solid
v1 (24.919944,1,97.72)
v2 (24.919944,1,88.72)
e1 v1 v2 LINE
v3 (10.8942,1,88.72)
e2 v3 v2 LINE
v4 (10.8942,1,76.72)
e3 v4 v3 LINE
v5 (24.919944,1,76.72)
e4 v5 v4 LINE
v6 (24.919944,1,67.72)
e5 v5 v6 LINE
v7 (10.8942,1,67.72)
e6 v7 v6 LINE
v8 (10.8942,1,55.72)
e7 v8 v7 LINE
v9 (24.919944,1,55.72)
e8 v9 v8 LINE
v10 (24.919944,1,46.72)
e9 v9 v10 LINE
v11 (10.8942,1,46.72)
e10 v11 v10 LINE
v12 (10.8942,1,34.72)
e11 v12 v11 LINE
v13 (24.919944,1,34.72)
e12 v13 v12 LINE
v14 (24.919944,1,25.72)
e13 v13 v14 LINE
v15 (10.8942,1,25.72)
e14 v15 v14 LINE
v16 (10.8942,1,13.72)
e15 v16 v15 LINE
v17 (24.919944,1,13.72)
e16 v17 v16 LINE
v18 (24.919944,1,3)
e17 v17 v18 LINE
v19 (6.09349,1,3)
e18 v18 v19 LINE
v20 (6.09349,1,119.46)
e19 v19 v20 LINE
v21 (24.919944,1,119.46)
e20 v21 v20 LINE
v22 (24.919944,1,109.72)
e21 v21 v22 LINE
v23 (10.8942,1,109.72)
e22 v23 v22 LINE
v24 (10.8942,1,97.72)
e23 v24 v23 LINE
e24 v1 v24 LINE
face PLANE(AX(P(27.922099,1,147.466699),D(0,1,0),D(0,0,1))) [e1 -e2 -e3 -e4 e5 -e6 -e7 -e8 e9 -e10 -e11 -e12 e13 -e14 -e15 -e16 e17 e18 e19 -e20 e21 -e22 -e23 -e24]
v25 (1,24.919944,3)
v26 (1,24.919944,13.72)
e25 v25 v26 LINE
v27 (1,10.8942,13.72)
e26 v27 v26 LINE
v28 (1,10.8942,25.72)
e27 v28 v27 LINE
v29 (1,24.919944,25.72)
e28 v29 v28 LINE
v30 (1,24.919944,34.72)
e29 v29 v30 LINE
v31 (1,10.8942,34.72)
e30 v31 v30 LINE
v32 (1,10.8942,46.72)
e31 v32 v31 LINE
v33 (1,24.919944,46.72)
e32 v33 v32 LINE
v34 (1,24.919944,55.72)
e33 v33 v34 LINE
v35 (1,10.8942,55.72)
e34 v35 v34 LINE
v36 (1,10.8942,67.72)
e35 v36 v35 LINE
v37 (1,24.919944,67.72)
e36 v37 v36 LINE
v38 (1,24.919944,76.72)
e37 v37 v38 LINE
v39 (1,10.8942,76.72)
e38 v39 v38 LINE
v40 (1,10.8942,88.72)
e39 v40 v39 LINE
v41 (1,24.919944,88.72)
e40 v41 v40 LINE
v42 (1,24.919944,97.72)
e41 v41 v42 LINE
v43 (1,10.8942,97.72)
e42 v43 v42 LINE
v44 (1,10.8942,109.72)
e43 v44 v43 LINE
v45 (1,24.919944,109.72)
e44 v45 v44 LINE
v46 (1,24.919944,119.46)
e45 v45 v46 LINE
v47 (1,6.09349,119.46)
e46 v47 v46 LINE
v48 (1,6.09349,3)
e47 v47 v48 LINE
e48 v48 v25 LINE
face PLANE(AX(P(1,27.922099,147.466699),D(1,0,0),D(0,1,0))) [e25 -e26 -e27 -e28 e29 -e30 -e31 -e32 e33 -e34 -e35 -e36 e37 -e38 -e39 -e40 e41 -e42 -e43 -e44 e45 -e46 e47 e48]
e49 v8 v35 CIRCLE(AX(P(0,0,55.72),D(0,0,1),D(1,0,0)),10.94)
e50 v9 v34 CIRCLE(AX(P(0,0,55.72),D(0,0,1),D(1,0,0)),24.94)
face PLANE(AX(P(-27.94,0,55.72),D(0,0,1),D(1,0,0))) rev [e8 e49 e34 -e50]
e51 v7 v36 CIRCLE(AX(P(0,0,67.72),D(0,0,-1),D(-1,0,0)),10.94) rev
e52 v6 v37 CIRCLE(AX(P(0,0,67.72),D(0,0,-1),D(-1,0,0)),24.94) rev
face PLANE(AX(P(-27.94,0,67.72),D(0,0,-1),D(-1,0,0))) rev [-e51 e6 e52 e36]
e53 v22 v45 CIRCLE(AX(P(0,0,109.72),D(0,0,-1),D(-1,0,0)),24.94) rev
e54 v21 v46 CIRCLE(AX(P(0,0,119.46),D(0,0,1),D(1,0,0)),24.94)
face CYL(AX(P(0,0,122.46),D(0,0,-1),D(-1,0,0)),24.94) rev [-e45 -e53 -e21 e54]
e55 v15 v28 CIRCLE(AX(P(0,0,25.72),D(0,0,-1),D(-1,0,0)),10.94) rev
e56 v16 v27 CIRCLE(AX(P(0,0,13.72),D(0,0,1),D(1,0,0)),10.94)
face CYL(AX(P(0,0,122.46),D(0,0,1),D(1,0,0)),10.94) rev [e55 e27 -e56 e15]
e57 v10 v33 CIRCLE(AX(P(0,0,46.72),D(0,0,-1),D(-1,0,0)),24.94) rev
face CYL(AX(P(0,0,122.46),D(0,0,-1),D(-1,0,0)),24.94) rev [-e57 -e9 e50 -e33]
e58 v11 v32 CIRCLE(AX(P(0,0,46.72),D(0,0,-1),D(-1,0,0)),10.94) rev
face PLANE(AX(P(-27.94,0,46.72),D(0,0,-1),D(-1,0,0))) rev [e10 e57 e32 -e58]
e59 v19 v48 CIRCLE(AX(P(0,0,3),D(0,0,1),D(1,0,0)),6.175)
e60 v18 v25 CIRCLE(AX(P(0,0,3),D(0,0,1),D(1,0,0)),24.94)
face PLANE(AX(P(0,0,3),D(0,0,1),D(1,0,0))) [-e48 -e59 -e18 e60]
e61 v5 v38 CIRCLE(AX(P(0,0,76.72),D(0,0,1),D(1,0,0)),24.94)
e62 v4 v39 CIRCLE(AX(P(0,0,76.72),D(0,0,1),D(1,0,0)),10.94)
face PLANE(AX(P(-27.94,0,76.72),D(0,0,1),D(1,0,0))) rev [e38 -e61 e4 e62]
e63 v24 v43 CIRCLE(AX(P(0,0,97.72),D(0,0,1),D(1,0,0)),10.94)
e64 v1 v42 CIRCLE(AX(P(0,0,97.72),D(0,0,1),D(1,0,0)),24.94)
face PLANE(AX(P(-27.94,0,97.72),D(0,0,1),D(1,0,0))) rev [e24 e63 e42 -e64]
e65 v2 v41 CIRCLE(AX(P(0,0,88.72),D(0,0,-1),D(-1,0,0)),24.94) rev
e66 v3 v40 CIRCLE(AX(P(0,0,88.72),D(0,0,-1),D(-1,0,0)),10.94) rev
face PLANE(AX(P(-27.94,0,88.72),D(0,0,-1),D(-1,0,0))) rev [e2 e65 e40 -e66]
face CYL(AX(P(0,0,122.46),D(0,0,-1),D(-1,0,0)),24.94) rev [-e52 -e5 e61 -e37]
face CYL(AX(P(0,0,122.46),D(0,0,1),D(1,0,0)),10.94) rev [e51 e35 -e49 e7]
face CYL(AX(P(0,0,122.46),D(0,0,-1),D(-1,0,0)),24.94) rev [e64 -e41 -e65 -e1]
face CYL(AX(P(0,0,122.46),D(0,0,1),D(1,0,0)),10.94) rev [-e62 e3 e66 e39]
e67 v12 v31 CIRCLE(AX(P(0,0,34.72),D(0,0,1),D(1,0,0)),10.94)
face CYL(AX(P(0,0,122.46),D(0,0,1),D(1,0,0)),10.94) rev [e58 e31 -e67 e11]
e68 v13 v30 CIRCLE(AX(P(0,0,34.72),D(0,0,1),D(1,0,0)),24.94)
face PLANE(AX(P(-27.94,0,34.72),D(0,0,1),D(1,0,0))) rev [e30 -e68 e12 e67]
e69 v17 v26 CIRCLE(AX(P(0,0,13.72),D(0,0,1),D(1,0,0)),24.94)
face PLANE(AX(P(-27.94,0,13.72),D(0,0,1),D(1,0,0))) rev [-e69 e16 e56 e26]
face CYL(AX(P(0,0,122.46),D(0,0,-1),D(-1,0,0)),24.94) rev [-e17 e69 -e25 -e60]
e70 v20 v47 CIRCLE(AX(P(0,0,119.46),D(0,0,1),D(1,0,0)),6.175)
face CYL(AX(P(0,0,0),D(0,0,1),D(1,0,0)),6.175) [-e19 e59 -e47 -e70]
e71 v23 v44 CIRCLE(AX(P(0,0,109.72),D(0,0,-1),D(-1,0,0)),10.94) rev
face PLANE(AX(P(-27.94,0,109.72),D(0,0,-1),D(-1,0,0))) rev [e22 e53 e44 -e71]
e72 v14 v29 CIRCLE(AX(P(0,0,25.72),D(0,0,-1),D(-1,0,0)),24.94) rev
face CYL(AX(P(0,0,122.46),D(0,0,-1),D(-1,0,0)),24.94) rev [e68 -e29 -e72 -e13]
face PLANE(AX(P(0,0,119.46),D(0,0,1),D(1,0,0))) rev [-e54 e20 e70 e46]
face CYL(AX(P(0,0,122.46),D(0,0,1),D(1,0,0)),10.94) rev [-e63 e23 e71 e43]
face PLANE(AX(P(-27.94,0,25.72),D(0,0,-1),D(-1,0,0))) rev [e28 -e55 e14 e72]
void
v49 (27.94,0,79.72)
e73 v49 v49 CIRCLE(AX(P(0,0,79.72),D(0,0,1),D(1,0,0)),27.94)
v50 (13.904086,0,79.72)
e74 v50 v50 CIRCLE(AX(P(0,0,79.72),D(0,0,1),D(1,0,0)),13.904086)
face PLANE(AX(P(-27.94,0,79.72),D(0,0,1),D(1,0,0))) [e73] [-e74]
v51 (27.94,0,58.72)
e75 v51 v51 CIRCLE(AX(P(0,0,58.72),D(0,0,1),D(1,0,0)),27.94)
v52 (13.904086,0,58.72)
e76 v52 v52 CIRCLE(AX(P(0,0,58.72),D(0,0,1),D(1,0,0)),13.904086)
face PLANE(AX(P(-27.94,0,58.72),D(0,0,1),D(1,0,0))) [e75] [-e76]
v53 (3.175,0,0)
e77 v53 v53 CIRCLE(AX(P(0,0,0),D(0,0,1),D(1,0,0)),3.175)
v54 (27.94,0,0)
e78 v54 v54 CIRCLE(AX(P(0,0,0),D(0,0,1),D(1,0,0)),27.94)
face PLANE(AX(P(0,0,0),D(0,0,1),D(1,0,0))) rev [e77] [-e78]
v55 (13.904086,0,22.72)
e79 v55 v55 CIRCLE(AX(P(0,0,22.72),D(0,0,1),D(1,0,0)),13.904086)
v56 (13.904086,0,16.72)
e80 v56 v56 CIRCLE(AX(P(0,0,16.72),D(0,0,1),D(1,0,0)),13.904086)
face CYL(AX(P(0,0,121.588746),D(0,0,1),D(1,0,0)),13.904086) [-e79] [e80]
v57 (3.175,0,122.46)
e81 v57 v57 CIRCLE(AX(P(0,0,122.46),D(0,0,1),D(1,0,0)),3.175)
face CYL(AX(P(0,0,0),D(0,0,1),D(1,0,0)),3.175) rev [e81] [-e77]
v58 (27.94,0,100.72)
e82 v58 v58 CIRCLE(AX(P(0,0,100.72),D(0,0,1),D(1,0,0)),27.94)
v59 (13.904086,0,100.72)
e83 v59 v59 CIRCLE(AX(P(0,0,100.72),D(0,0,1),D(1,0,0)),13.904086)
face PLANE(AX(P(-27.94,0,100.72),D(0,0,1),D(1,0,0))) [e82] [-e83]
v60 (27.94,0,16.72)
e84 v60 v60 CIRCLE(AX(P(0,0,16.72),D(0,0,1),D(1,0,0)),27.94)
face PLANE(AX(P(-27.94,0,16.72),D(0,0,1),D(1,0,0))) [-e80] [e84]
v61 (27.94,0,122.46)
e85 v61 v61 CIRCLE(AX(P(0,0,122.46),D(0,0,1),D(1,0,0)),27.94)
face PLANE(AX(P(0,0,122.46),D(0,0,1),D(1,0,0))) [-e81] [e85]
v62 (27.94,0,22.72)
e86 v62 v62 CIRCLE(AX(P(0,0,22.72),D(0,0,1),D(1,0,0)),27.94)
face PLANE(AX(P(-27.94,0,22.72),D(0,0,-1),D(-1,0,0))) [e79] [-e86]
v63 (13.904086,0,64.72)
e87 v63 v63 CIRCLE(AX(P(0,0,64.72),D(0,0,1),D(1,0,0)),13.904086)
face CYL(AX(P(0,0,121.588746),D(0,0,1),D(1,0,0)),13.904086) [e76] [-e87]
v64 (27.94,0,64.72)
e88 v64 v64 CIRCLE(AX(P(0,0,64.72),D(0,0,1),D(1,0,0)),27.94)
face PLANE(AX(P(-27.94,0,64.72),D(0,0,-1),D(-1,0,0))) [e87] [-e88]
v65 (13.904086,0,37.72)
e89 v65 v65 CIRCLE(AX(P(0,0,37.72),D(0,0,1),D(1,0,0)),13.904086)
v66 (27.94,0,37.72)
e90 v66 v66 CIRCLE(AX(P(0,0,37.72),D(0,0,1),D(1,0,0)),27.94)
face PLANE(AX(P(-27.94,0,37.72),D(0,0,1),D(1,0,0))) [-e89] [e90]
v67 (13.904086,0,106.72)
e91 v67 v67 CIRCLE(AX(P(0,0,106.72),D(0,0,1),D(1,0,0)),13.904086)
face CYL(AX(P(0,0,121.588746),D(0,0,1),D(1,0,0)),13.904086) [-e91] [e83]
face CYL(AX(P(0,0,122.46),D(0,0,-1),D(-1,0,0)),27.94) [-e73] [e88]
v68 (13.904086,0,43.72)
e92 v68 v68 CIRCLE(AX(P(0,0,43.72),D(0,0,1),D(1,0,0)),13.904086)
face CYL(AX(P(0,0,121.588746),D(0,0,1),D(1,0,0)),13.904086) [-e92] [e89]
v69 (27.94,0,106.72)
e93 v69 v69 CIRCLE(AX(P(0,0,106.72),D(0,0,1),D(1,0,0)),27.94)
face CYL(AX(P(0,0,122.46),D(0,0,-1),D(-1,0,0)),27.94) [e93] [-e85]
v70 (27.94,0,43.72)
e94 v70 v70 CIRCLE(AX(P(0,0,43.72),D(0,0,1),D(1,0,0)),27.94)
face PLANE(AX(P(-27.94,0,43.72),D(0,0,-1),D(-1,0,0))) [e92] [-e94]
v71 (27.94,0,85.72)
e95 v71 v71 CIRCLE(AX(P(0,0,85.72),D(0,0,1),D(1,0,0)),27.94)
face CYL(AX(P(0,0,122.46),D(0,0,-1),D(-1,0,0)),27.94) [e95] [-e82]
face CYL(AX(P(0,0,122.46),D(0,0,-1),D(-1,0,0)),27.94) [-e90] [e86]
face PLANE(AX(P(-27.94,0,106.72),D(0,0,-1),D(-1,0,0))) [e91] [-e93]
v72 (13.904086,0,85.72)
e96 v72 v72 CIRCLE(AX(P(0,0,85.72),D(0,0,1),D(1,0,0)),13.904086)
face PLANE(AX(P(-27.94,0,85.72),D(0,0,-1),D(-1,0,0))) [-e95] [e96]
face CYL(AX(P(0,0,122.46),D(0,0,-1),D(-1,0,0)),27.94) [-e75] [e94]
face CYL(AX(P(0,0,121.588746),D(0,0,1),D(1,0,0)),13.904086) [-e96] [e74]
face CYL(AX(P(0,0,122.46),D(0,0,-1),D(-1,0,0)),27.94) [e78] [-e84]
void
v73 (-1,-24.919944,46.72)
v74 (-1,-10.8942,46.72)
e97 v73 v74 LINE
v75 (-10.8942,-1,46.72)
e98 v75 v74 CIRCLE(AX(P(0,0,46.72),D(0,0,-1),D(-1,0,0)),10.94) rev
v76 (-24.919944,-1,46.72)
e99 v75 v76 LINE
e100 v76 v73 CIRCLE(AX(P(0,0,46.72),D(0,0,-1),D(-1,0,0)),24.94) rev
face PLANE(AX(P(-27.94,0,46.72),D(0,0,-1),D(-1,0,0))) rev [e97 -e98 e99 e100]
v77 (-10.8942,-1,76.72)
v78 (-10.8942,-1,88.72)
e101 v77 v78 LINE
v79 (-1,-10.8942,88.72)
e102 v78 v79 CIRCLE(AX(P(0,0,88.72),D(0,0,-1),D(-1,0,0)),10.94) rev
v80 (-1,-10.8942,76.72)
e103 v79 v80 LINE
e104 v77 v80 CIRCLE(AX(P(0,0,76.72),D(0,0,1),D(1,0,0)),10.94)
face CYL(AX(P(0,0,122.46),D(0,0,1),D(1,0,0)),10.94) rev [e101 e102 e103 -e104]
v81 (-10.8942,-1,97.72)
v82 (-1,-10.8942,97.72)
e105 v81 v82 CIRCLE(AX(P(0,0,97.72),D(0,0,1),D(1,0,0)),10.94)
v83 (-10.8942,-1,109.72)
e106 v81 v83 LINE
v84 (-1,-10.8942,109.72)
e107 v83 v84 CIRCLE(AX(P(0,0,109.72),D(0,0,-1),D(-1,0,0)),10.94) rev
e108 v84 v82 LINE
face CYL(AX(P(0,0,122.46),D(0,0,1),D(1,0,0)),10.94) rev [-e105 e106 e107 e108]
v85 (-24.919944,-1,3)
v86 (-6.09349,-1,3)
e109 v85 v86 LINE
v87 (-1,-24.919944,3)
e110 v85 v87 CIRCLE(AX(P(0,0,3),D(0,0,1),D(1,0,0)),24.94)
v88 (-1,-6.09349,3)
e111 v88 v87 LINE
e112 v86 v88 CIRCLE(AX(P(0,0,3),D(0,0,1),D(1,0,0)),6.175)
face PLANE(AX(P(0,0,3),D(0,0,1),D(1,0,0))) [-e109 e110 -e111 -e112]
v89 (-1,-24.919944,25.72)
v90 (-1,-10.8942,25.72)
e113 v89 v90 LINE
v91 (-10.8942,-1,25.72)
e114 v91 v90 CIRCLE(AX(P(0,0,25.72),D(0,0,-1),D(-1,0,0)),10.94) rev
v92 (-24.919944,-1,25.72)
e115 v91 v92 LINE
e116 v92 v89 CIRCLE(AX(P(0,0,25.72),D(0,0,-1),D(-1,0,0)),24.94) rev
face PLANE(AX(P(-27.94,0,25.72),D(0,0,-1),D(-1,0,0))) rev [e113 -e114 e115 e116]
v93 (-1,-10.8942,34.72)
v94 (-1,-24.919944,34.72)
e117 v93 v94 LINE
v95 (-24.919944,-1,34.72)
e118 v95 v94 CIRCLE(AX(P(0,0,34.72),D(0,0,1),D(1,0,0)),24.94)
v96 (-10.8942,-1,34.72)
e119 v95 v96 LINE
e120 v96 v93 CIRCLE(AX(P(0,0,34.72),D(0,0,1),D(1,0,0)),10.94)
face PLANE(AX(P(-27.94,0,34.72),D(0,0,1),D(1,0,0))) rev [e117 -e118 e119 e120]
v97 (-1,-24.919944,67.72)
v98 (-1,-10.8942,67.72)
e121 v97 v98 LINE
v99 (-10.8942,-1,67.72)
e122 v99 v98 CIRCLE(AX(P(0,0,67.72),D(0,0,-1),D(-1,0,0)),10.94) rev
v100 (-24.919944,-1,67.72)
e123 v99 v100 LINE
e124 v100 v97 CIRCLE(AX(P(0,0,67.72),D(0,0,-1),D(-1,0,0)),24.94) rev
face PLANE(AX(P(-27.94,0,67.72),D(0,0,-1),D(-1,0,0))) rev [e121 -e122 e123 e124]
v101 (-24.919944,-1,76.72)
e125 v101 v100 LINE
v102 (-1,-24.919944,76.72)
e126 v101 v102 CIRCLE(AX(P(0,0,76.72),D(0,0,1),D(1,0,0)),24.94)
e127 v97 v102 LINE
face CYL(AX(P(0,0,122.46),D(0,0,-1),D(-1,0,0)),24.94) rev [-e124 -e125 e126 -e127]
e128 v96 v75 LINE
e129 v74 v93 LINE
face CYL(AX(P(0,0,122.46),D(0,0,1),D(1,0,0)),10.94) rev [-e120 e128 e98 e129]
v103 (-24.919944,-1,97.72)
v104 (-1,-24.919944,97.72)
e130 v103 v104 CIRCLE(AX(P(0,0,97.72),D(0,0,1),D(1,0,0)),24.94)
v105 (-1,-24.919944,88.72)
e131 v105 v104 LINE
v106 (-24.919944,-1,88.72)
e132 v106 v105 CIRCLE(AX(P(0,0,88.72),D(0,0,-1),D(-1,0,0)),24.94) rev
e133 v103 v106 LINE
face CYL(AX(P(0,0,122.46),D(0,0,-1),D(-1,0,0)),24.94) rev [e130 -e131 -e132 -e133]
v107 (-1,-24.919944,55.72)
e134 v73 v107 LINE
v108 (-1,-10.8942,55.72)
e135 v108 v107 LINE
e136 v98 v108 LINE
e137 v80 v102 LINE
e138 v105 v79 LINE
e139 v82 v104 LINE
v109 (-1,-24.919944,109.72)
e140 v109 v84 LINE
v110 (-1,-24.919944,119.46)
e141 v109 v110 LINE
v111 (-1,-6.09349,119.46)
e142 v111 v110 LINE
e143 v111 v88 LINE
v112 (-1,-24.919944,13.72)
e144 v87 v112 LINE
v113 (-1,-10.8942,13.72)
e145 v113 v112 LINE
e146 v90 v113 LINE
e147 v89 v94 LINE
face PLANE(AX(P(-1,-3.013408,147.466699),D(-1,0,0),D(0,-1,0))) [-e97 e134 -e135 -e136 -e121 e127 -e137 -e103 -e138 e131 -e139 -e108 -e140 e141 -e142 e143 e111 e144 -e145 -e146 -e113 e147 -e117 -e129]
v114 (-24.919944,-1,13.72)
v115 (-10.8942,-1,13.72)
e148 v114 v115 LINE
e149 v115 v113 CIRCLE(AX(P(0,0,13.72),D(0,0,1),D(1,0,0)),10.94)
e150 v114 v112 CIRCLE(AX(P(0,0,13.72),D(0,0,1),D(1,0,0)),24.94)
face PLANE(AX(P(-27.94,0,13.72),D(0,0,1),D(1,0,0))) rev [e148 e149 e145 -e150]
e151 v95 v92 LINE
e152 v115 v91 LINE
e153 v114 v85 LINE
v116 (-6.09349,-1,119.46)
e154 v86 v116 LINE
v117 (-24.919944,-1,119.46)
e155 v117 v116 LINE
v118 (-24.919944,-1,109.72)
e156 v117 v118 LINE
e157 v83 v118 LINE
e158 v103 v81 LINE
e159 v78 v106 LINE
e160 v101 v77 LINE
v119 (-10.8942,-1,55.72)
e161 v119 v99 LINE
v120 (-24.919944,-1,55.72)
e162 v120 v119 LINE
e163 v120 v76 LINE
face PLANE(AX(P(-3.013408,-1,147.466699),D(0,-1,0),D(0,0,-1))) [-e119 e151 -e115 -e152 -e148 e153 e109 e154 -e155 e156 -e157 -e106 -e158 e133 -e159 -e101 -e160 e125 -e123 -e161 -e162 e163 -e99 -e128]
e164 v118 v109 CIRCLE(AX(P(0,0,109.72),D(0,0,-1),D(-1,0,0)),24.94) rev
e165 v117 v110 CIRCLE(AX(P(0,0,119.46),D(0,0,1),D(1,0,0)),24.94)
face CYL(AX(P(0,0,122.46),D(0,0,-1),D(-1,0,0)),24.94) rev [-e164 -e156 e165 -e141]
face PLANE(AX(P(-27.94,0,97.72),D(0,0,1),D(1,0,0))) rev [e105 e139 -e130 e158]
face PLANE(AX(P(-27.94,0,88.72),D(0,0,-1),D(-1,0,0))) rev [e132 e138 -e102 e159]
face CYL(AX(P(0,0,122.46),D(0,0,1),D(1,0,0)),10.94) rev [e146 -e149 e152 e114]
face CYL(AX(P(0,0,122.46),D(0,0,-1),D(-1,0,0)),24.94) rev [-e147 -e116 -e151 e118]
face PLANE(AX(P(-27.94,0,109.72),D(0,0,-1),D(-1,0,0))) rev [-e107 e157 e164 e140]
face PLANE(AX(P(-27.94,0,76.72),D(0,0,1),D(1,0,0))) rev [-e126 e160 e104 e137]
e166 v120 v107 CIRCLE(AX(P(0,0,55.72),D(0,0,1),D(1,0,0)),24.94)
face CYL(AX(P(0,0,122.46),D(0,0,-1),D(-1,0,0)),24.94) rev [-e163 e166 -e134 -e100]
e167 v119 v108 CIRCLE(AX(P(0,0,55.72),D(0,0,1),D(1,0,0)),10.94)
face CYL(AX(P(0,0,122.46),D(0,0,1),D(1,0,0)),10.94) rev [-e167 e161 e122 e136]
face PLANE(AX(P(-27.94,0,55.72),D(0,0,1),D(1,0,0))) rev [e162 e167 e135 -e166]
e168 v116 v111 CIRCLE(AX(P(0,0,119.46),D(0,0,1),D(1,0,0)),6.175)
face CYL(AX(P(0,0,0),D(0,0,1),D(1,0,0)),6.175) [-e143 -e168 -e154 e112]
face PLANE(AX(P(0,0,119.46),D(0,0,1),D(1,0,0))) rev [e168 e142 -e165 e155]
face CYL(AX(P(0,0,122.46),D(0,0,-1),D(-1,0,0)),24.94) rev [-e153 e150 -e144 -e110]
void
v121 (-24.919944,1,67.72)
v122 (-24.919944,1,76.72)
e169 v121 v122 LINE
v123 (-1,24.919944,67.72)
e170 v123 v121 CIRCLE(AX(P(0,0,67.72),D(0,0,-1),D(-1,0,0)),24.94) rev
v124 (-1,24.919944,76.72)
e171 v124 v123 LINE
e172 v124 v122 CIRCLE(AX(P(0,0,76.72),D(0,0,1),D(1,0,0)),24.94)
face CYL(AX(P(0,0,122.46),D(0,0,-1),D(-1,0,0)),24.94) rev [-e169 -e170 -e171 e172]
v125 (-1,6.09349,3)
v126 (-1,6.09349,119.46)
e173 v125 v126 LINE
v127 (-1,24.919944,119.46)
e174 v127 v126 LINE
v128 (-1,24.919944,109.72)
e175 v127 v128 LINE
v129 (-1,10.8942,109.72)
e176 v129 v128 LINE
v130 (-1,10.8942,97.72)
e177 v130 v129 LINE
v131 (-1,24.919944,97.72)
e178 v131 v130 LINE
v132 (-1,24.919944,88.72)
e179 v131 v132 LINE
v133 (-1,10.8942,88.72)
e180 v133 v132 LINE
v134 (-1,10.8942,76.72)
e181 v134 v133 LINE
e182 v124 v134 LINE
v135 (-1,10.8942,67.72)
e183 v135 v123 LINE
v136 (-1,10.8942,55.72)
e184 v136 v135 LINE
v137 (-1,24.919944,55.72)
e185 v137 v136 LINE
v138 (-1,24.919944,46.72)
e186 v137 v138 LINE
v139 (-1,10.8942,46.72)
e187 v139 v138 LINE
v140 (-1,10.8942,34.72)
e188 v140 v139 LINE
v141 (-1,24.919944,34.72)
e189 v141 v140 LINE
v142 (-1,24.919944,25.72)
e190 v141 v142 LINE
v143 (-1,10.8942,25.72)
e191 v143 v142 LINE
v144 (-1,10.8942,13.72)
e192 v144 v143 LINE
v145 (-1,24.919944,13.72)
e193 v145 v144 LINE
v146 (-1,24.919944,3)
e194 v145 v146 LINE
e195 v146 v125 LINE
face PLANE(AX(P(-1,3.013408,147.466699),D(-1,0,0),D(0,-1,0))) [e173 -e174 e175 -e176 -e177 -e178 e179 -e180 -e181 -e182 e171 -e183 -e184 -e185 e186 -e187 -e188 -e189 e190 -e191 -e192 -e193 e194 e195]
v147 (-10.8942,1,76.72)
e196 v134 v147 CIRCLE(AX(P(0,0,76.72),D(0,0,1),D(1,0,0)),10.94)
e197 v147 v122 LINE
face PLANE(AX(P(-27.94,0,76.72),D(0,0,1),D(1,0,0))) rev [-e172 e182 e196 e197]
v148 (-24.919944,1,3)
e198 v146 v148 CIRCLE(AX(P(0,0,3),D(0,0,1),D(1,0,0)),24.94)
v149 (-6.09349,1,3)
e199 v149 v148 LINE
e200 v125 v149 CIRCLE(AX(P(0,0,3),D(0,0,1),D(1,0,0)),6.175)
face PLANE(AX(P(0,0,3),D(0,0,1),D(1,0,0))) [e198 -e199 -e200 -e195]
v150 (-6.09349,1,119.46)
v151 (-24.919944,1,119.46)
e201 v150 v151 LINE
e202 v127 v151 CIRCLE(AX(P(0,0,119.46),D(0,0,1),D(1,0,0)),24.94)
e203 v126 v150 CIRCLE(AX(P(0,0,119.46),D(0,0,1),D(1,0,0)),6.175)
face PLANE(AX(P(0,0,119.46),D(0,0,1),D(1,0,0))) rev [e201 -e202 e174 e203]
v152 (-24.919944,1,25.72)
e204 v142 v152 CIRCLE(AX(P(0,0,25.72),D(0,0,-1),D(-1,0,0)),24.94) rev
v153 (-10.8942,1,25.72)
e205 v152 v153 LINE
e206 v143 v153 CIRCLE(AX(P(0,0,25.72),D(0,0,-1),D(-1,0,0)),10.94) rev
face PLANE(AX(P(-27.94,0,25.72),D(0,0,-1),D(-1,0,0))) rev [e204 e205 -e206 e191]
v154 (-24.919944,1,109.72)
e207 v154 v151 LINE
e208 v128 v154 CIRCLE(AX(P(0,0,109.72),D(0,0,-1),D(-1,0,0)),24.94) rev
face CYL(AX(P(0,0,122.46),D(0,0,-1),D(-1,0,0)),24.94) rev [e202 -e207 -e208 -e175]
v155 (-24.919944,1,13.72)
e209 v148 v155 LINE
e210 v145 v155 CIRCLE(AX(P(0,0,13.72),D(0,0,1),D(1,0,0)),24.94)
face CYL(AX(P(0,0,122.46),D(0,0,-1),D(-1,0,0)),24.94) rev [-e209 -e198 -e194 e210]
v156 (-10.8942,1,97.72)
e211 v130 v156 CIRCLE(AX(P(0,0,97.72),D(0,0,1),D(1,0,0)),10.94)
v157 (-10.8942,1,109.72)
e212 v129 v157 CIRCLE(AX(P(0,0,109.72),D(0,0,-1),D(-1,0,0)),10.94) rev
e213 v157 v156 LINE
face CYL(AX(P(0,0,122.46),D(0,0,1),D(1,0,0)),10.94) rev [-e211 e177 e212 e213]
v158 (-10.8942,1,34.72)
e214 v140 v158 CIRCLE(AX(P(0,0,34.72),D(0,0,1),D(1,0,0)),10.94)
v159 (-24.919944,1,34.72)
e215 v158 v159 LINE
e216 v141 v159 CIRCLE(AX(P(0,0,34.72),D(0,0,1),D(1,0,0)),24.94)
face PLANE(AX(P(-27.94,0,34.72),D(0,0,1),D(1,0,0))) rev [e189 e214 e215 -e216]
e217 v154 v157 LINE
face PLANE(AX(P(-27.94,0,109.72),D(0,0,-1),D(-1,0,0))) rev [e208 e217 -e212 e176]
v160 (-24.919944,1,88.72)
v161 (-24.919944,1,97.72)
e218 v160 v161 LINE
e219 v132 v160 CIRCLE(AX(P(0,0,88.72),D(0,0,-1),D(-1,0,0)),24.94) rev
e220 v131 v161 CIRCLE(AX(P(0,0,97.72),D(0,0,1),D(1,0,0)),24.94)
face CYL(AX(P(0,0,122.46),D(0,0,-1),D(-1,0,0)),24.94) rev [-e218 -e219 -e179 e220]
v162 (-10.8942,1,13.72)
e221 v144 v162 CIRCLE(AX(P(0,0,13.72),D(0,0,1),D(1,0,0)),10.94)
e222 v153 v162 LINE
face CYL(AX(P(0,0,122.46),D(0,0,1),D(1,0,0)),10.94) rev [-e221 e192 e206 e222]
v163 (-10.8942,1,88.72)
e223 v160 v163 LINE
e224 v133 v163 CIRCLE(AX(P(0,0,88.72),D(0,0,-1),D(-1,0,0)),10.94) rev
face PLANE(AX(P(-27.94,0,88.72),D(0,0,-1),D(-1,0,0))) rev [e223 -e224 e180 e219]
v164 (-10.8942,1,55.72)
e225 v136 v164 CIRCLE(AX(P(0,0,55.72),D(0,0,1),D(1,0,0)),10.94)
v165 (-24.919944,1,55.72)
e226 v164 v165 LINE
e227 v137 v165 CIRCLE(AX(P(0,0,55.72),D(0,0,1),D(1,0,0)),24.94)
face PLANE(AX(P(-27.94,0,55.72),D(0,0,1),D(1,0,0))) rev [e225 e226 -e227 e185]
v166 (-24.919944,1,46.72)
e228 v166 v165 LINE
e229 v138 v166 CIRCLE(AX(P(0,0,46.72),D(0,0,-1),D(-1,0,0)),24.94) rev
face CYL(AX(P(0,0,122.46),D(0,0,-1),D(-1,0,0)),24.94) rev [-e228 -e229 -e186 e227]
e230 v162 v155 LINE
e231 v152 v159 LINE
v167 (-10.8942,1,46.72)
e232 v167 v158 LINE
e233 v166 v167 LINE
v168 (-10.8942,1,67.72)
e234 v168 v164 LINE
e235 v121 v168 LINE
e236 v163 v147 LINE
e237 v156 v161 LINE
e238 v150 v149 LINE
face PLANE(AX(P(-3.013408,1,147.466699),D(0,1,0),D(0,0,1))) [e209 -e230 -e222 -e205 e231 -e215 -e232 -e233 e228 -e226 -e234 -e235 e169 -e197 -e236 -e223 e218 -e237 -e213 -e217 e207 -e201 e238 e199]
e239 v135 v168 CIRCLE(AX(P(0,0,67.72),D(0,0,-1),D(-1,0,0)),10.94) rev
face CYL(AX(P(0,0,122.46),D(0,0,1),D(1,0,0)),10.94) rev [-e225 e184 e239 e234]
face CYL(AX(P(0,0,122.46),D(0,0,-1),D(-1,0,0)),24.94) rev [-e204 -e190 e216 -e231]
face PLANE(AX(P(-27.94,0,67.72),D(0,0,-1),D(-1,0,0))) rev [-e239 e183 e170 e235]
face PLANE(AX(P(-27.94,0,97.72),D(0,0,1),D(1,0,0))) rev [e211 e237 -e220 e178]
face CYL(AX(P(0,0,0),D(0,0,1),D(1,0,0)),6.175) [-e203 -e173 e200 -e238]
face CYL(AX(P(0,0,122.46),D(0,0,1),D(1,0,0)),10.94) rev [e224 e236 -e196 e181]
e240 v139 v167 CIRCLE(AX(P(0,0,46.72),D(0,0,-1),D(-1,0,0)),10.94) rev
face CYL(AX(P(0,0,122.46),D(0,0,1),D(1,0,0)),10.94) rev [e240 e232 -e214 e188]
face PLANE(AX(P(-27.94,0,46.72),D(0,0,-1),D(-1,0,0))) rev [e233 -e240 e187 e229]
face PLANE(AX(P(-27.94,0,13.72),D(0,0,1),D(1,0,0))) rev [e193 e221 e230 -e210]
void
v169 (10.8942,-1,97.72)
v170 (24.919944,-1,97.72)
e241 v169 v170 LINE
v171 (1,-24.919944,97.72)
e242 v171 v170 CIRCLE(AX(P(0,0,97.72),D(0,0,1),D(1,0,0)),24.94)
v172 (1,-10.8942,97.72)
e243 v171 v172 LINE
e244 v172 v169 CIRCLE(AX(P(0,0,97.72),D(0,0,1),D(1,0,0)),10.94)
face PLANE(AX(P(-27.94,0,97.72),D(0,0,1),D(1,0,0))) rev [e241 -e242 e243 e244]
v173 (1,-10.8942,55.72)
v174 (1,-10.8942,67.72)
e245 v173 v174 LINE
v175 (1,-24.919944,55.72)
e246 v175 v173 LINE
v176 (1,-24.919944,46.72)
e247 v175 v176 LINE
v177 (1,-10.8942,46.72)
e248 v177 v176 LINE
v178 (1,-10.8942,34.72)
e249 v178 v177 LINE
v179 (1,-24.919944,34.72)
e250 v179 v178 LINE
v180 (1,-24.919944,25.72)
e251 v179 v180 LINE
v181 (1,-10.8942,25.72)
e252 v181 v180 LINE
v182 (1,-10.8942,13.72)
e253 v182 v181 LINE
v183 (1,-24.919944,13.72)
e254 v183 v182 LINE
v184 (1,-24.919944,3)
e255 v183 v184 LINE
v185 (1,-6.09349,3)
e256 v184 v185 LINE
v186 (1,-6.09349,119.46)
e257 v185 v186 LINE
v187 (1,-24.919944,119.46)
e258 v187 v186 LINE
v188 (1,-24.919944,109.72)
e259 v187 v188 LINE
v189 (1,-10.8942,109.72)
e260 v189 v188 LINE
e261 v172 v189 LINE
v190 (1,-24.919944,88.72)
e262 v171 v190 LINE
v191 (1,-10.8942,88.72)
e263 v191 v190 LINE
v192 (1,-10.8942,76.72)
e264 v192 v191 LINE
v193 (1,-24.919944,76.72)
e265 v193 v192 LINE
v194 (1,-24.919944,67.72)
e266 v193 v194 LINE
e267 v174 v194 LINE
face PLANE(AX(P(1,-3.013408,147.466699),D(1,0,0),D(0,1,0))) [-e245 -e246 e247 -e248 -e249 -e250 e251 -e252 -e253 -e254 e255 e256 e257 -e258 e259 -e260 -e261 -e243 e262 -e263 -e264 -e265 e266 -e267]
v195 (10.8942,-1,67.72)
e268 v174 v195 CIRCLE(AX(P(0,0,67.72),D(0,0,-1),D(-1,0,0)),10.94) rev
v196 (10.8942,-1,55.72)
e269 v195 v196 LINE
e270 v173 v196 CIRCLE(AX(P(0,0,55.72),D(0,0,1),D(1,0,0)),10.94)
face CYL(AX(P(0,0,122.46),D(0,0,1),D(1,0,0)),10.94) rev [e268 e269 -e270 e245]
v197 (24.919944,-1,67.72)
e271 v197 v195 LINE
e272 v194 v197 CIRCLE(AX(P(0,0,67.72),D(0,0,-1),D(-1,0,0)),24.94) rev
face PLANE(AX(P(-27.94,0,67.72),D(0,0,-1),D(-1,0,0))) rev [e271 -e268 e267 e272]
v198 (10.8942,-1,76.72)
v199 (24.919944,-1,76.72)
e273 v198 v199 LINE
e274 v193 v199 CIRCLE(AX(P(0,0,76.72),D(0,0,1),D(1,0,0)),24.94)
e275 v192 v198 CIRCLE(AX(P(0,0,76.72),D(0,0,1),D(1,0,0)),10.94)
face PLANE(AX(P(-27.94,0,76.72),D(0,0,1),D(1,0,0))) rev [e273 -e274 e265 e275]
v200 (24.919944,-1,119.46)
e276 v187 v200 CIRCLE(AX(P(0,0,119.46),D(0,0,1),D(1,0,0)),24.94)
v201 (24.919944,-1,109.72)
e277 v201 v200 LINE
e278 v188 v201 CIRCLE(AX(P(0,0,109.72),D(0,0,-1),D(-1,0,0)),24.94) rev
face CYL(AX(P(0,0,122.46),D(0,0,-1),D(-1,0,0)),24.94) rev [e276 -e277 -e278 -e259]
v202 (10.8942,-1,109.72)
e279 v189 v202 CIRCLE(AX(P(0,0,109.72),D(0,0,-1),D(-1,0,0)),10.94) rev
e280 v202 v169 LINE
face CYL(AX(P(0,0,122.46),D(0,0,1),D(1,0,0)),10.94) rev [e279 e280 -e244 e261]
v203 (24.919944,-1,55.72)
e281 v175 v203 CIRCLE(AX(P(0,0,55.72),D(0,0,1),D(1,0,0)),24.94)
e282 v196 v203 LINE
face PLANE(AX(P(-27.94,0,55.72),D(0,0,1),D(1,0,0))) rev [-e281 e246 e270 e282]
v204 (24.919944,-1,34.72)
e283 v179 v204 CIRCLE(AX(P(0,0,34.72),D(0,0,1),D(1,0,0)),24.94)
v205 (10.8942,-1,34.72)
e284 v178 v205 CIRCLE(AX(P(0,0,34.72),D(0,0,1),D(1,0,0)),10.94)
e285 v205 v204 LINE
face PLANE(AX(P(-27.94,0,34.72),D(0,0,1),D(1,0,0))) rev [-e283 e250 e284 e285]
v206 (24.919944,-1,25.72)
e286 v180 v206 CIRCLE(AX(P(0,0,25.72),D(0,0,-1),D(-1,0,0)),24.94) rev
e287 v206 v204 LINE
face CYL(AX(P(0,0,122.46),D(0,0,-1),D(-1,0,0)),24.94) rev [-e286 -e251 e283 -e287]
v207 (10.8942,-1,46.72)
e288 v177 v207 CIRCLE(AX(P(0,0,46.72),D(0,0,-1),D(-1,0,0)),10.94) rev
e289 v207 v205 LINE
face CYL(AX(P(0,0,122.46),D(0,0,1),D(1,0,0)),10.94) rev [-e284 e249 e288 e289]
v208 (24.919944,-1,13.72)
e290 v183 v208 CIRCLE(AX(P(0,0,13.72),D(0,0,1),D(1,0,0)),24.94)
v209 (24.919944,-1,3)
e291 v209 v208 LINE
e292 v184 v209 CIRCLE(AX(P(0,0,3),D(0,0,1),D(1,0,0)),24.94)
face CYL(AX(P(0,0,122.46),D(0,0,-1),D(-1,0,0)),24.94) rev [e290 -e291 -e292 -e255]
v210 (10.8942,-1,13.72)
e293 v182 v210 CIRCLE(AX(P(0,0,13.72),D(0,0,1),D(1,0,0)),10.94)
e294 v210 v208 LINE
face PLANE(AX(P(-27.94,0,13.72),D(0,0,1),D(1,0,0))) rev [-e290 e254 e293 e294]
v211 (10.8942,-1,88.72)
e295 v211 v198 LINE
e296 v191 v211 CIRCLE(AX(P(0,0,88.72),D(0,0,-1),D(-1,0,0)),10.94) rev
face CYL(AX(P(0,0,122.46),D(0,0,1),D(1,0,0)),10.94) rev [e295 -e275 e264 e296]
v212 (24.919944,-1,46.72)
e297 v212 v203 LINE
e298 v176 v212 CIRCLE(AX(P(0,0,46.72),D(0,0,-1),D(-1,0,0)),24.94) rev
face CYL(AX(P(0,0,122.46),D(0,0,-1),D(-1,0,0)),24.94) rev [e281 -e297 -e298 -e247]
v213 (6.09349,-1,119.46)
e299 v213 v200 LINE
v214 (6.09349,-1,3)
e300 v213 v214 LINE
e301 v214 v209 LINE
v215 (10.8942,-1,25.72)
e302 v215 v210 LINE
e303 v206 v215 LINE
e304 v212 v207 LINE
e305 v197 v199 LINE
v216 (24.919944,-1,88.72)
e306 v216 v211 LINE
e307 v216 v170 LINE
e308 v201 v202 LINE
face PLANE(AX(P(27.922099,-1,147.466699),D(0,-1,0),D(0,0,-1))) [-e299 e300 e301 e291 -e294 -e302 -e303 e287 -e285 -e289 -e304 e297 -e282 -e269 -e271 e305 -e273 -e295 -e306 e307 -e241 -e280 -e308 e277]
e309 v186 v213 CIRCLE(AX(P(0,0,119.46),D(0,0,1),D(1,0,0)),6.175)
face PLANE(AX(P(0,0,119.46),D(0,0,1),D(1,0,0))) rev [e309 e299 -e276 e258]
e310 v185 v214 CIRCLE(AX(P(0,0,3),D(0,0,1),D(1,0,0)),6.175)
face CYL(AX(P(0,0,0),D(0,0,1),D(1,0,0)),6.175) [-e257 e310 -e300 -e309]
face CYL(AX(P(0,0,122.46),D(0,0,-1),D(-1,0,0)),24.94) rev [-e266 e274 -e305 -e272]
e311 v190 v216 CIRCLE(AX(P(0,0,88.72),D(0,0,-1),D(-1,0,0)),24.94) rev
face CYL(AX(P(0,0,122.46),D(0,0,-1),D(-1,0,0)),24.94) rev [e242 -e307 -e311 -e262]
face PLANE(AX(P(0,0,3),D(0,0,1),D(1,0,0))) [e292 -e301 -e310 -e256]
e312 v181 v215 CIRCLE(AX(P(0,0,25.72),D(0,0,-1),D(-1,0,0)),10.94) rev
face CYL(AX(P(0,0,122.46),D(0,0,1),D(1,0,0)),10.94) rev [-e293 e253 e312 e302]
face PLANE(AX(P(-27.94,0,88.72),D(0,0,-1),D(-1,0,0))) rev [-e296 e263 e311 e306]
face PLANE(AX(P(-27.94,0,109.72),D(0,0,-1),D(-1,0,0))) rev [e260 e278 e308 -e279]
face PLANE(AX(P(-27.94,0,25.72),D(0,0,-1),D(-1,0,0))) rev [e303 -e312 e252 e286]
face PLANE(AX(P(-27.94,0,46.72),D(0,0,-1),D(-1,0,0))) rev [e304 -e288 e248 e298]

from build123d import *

# Parameters (mm, degrees)
SKETCH3_R            = 27.94
BOSS_EXTRUDE2_DEPTH  = 122.46
SKETCH5_R            = 3.175
CUT_EXTRUDE1_DEPTH   = 129.676877488
SKETCH4_W            = 14
SKETCH4_H            = 6
SHELL1_START         = 3
SHELL1_OUTLINE_R     = 10.94
SHELL1_OUTLINE_R_2   = 6.175
SHELL1_DEPTH         = 116.46
SHELL1_2_OUTLINE_R   = 24.94
SHELL1_2_OUTLINE_R_2 = 10.94
SHELL1_2_DEPTH       = 10.72
SHELL1_START_2       = 109.72
SHELL1_3_OUTLINE_R   = 24.94
SHELL1_3_OUTLINE_R_2 = 10.94
SHELL1_3_DEPTH       = 9.74
SHELL1_START_3       = 25.72
SHELL1_4_OUTLINE_R   = 24.94
SHELL1_4_OUTLINE_R_2 = 10.94
SHELL1_4_DEPTH       = 9
SHELL1_START_4       = 46.72
SHELL1_5_OUTLINE_R   = 24.94
SHELL1_5_OUTLINE_R_2 = 10.94
SHELL1_5_DEPTH       = 9
SHELL1_START_5       = 67.72
SHELL1_6_OUTLINE_R   = 24.94
SHELL1_6_OUTLINE_R_2 = 10.94
SHELL1_6_DEPTH       = 9
SHELL1_START_6       = 88.72
SHELL1_7_OUTLINE_R   = 24.94
SHELL1_7_OUTLINE_R_2 = 10.94
SHELL1_7_DEPTH       = 9
BOSS_EXTRUDE3_START  = -119.46
BOSS_EXTRUDE3_DEPTH  = 116.46
SKETCH13_W           = 16.483162312
SKETCH13_H           = 6


# Read off the part's stored shape, not the designer's step: Shell1, Boss-Extrude3
with BuildPart() as part:
    # Sketch3 → Boss-Extrude2 (new body)
    with BuildSketch(Plane.XY):
        Circle(SKETCH3_R)
    extrude(amount=BOSS_EXTRUDE2_DEPTH)

    # Sketch5 → Cut-Extrude1 (cut, through all)
    with BuildSketch(Plane.XY.offset(122.46)):
        Circle(SKETCH5_R)
    extrude(amount=-CUT_EXTRUDE1_DEPTH, mode=Mode.SUBTRACT)

    # Sketch4 → Cut-Revolve1 (revolve, cut)
    with BuildSketch(Plane(origin=(0, 0, 0), x_dir=(1, 0, 0), z_dir=(0, 1, 0)), mode=Mode.PRIVATE) as cut_revolve1_sk:
        with Locations((-20.94, -103.72)):
            Rectangle(SKETCH4_W, SKETCH4_H)
        with Locations((-20.94, -82.72)):
            Rectangle(SKETCH4_W, SKETCH4_H)
        with Locations((-20.94, -61.72)):
            Rectangle(SKETCH4_W, SKETCH4_H)
        with Locations((-20.94, -40.72)):
            Rectangle(SKETCH4_W, SKETCH4_H)
        with Locations((-20.94, -19.72)):
            Rectangle(SKETCH4_W, SKETCH4_H)
    revolve(cut_revolve1_sk.sketch.rotate(Axis((0, 0, 122.46), (0, 0, -1)), 180), axis=Axis((0, 0, 122.46), (0, 0, -1)), mode=Mode.SUBTRACT)

    # Shell1 outline → Shell1 (cut)
    with BuildSketch(Plane.XY.offset(SHELL1_START)):
        Circle(SHELL1_OUTLINE_R)
        Circle(SHELL1_OUTLINE_R_2, mode=Mode.SUBTRACT)
    extrude(amount=SHELL1_DEPTH, mode=Mode.SUBTRACT)

    # Shell1 2 outline → Shell1 2 (cut)
    with BuildSketch(Plane.XY.offset(SHELL1_START)):
        Circle(SHELL1_2_OUTLINE_R)
        Circle(SHELL1_2_OUTLINE_R_2, mode=Mode.SUBTRACT)
    extrude(amount=SHELL1_2_DEPTH, mode=Mode.SUBTRACT)

    # Shell1 3 outline → Shell1 3 (cut)
    with BuildSketch(Plane.XY.offset(SHELL1_START_2)):
        Circle(SHELL1_3_OUTLINE_R)
        Circle(SHELL1_3_OUTLINE_R_2, mode=Mode.SUBTRACT)
    extrude(amount=SHELL1_3_DEPTH, mode=Mode.SUBTRACT)

    # Shell1 4 outline → Shell1 4 (cut)
    with BuildSketch(Plane.XY.offset(SHELL1_START_3)):
        Circle(SHELL1_4_OUTLINE_R)
        Circle(SHELL1_4_OUTLINE_R_2, mode=Mode.SUBTRACT)
    extrude(amount=SHELL1_4_DEPTH, mode=Mode.SUBTRACT)

    # Shell1 5 outline → Shell1 5 (cut)
    with BuildSketch(Plane.XY.offset(SHELL1_START_4)):
        Circle(SHELL1_5_OUTLINE_R)
        Circle(SHELL1_5_OUTLINE_R_2, mode=Mode.SUBTRACT)
    extrude(amount=SHELL1_5_DEPTH, mode=Mode.SUBTRACT)

    # Shell1 6 outline → Shell1 6 (cut)
    with BuildSketch(Plane.XY.offset(SHELL1_START_5)):
        Circle(SHELL1_6_OUTLINE_R)
        Circle(SHELL1_6_OUTLINE_R_2, mode=Mode.SUBTRACT)
    extrude(amount=SHELL1_6_DEPTH, mode=Mode.SUBTRACT)

    # Shell1 7 outline → Shell1 7 (cut)
    with BuildSketch(Plane.XY.offset(SHELL1_START_6)):
        Circle(SHELL1_7_OUTLINE_R)
        Circle(SHELL1_7_OUTLINE_R_2, mode=Mode.SUBTRACT)
    extrude(amount=SHELL1_7_DEPTH, mode=Mode.SUBTRACT)

    # Boss-Extrude3 outline → Boss-Extrude3 (add)
    with BuildSketch(Plane(origin=(0, 0, 0), x_dir=(-1, 0, 0), z_dir=(0, 0, -1)).offset(BOSS_EXTRUDE3_START)):
        with BuildLine():
            ThreePointArc((1, 27.922098775), (0, 27.94), (-1, 27.922098775))
            Line((-1, 27.922098775), (-1, 6.093490379))
            ThreePointArc((-1, 6.093490379), (0, 6.175), (1, 6.093490379))
            Line((1, 6.093490379), (1, 27.922098775))
        make_face()
        with BuildLine():
            Line((-27.922098775, -1), (-6.093490379, -1))
            ThreePointArc((-6.093490379, -1), (-6.175, 0), (-6.093490379, 1))
            Line((-6.093490379, 1), (-27.922098775, 1))
            ThreePointArc((-27.922098775, 1), (-27.94, 0), (-27.922098775, -1))
        make_face()
        with BuildLine():
            ThreePointArc((27.922098775, -1), (27.94, 0), (27.922098775, 1))
            Line((27.922098775, 1), (6.093490379, 1))
            ThreePointArc((6.093490379, 1), (6.175, 0), (6.093490379, -1))
            Line((6.093490379, -1), (27.922098775, -1))
        make_face()
        with BuildLine():
            Line((1, -27.922098775), (1, -6.093490379))
            ThreePointArc((1, -6.093490379), (0, -6.175), (-1, -6.093490379))
            Line((-1, -6.093490379), (-1, -27.922098775))
            ThreePointArc((-1, -27.922098775), (0, -27.94), (1, -27.922098775))
        make_face()
    extrude(amount=BOSS_EXTRUDE3_DEPTH)

    # Sketch13 → Cut-Revolve2 (revolve, cut)
    with BuildSketch(Plane(origin=(0, 0, 0), x_dir=(1, 0, 0), z_dir=(0, 1, 0)), mode=Mode.PRIVATE) as cut_revolve2_sk:
        with Locations((-22.145666886, -40.72)):
            Rectangle(SKETCH13_W, SKETCH13_H)
        with Locations((-22.145666886, -19.72)):
            Rectangle(SKETCH13_W, SKETCH13_H)
        with Locations((-22.145666886, -61.72)):
            Rectangle(SKETCH13_W, SKETCH13_H)
        with Locations((-22.145666886, -82.72)):
            Rectangle(SKETCH13_W, SKETCH13_H)
        with Locations((-22.145666886, -103.72)):
            Rectangle(SKETCH13_W, SKETCH13_H)
    revolve(cut_revolve2_sk.sketch.rotate(Axis((0, 0, 121.588746248), (0, 0, -1)), 180), axis=Axis((0, 0, 121.588746248), (0, 0, -1)), mode=Mode.SUBTRACT)


solid = part.part
